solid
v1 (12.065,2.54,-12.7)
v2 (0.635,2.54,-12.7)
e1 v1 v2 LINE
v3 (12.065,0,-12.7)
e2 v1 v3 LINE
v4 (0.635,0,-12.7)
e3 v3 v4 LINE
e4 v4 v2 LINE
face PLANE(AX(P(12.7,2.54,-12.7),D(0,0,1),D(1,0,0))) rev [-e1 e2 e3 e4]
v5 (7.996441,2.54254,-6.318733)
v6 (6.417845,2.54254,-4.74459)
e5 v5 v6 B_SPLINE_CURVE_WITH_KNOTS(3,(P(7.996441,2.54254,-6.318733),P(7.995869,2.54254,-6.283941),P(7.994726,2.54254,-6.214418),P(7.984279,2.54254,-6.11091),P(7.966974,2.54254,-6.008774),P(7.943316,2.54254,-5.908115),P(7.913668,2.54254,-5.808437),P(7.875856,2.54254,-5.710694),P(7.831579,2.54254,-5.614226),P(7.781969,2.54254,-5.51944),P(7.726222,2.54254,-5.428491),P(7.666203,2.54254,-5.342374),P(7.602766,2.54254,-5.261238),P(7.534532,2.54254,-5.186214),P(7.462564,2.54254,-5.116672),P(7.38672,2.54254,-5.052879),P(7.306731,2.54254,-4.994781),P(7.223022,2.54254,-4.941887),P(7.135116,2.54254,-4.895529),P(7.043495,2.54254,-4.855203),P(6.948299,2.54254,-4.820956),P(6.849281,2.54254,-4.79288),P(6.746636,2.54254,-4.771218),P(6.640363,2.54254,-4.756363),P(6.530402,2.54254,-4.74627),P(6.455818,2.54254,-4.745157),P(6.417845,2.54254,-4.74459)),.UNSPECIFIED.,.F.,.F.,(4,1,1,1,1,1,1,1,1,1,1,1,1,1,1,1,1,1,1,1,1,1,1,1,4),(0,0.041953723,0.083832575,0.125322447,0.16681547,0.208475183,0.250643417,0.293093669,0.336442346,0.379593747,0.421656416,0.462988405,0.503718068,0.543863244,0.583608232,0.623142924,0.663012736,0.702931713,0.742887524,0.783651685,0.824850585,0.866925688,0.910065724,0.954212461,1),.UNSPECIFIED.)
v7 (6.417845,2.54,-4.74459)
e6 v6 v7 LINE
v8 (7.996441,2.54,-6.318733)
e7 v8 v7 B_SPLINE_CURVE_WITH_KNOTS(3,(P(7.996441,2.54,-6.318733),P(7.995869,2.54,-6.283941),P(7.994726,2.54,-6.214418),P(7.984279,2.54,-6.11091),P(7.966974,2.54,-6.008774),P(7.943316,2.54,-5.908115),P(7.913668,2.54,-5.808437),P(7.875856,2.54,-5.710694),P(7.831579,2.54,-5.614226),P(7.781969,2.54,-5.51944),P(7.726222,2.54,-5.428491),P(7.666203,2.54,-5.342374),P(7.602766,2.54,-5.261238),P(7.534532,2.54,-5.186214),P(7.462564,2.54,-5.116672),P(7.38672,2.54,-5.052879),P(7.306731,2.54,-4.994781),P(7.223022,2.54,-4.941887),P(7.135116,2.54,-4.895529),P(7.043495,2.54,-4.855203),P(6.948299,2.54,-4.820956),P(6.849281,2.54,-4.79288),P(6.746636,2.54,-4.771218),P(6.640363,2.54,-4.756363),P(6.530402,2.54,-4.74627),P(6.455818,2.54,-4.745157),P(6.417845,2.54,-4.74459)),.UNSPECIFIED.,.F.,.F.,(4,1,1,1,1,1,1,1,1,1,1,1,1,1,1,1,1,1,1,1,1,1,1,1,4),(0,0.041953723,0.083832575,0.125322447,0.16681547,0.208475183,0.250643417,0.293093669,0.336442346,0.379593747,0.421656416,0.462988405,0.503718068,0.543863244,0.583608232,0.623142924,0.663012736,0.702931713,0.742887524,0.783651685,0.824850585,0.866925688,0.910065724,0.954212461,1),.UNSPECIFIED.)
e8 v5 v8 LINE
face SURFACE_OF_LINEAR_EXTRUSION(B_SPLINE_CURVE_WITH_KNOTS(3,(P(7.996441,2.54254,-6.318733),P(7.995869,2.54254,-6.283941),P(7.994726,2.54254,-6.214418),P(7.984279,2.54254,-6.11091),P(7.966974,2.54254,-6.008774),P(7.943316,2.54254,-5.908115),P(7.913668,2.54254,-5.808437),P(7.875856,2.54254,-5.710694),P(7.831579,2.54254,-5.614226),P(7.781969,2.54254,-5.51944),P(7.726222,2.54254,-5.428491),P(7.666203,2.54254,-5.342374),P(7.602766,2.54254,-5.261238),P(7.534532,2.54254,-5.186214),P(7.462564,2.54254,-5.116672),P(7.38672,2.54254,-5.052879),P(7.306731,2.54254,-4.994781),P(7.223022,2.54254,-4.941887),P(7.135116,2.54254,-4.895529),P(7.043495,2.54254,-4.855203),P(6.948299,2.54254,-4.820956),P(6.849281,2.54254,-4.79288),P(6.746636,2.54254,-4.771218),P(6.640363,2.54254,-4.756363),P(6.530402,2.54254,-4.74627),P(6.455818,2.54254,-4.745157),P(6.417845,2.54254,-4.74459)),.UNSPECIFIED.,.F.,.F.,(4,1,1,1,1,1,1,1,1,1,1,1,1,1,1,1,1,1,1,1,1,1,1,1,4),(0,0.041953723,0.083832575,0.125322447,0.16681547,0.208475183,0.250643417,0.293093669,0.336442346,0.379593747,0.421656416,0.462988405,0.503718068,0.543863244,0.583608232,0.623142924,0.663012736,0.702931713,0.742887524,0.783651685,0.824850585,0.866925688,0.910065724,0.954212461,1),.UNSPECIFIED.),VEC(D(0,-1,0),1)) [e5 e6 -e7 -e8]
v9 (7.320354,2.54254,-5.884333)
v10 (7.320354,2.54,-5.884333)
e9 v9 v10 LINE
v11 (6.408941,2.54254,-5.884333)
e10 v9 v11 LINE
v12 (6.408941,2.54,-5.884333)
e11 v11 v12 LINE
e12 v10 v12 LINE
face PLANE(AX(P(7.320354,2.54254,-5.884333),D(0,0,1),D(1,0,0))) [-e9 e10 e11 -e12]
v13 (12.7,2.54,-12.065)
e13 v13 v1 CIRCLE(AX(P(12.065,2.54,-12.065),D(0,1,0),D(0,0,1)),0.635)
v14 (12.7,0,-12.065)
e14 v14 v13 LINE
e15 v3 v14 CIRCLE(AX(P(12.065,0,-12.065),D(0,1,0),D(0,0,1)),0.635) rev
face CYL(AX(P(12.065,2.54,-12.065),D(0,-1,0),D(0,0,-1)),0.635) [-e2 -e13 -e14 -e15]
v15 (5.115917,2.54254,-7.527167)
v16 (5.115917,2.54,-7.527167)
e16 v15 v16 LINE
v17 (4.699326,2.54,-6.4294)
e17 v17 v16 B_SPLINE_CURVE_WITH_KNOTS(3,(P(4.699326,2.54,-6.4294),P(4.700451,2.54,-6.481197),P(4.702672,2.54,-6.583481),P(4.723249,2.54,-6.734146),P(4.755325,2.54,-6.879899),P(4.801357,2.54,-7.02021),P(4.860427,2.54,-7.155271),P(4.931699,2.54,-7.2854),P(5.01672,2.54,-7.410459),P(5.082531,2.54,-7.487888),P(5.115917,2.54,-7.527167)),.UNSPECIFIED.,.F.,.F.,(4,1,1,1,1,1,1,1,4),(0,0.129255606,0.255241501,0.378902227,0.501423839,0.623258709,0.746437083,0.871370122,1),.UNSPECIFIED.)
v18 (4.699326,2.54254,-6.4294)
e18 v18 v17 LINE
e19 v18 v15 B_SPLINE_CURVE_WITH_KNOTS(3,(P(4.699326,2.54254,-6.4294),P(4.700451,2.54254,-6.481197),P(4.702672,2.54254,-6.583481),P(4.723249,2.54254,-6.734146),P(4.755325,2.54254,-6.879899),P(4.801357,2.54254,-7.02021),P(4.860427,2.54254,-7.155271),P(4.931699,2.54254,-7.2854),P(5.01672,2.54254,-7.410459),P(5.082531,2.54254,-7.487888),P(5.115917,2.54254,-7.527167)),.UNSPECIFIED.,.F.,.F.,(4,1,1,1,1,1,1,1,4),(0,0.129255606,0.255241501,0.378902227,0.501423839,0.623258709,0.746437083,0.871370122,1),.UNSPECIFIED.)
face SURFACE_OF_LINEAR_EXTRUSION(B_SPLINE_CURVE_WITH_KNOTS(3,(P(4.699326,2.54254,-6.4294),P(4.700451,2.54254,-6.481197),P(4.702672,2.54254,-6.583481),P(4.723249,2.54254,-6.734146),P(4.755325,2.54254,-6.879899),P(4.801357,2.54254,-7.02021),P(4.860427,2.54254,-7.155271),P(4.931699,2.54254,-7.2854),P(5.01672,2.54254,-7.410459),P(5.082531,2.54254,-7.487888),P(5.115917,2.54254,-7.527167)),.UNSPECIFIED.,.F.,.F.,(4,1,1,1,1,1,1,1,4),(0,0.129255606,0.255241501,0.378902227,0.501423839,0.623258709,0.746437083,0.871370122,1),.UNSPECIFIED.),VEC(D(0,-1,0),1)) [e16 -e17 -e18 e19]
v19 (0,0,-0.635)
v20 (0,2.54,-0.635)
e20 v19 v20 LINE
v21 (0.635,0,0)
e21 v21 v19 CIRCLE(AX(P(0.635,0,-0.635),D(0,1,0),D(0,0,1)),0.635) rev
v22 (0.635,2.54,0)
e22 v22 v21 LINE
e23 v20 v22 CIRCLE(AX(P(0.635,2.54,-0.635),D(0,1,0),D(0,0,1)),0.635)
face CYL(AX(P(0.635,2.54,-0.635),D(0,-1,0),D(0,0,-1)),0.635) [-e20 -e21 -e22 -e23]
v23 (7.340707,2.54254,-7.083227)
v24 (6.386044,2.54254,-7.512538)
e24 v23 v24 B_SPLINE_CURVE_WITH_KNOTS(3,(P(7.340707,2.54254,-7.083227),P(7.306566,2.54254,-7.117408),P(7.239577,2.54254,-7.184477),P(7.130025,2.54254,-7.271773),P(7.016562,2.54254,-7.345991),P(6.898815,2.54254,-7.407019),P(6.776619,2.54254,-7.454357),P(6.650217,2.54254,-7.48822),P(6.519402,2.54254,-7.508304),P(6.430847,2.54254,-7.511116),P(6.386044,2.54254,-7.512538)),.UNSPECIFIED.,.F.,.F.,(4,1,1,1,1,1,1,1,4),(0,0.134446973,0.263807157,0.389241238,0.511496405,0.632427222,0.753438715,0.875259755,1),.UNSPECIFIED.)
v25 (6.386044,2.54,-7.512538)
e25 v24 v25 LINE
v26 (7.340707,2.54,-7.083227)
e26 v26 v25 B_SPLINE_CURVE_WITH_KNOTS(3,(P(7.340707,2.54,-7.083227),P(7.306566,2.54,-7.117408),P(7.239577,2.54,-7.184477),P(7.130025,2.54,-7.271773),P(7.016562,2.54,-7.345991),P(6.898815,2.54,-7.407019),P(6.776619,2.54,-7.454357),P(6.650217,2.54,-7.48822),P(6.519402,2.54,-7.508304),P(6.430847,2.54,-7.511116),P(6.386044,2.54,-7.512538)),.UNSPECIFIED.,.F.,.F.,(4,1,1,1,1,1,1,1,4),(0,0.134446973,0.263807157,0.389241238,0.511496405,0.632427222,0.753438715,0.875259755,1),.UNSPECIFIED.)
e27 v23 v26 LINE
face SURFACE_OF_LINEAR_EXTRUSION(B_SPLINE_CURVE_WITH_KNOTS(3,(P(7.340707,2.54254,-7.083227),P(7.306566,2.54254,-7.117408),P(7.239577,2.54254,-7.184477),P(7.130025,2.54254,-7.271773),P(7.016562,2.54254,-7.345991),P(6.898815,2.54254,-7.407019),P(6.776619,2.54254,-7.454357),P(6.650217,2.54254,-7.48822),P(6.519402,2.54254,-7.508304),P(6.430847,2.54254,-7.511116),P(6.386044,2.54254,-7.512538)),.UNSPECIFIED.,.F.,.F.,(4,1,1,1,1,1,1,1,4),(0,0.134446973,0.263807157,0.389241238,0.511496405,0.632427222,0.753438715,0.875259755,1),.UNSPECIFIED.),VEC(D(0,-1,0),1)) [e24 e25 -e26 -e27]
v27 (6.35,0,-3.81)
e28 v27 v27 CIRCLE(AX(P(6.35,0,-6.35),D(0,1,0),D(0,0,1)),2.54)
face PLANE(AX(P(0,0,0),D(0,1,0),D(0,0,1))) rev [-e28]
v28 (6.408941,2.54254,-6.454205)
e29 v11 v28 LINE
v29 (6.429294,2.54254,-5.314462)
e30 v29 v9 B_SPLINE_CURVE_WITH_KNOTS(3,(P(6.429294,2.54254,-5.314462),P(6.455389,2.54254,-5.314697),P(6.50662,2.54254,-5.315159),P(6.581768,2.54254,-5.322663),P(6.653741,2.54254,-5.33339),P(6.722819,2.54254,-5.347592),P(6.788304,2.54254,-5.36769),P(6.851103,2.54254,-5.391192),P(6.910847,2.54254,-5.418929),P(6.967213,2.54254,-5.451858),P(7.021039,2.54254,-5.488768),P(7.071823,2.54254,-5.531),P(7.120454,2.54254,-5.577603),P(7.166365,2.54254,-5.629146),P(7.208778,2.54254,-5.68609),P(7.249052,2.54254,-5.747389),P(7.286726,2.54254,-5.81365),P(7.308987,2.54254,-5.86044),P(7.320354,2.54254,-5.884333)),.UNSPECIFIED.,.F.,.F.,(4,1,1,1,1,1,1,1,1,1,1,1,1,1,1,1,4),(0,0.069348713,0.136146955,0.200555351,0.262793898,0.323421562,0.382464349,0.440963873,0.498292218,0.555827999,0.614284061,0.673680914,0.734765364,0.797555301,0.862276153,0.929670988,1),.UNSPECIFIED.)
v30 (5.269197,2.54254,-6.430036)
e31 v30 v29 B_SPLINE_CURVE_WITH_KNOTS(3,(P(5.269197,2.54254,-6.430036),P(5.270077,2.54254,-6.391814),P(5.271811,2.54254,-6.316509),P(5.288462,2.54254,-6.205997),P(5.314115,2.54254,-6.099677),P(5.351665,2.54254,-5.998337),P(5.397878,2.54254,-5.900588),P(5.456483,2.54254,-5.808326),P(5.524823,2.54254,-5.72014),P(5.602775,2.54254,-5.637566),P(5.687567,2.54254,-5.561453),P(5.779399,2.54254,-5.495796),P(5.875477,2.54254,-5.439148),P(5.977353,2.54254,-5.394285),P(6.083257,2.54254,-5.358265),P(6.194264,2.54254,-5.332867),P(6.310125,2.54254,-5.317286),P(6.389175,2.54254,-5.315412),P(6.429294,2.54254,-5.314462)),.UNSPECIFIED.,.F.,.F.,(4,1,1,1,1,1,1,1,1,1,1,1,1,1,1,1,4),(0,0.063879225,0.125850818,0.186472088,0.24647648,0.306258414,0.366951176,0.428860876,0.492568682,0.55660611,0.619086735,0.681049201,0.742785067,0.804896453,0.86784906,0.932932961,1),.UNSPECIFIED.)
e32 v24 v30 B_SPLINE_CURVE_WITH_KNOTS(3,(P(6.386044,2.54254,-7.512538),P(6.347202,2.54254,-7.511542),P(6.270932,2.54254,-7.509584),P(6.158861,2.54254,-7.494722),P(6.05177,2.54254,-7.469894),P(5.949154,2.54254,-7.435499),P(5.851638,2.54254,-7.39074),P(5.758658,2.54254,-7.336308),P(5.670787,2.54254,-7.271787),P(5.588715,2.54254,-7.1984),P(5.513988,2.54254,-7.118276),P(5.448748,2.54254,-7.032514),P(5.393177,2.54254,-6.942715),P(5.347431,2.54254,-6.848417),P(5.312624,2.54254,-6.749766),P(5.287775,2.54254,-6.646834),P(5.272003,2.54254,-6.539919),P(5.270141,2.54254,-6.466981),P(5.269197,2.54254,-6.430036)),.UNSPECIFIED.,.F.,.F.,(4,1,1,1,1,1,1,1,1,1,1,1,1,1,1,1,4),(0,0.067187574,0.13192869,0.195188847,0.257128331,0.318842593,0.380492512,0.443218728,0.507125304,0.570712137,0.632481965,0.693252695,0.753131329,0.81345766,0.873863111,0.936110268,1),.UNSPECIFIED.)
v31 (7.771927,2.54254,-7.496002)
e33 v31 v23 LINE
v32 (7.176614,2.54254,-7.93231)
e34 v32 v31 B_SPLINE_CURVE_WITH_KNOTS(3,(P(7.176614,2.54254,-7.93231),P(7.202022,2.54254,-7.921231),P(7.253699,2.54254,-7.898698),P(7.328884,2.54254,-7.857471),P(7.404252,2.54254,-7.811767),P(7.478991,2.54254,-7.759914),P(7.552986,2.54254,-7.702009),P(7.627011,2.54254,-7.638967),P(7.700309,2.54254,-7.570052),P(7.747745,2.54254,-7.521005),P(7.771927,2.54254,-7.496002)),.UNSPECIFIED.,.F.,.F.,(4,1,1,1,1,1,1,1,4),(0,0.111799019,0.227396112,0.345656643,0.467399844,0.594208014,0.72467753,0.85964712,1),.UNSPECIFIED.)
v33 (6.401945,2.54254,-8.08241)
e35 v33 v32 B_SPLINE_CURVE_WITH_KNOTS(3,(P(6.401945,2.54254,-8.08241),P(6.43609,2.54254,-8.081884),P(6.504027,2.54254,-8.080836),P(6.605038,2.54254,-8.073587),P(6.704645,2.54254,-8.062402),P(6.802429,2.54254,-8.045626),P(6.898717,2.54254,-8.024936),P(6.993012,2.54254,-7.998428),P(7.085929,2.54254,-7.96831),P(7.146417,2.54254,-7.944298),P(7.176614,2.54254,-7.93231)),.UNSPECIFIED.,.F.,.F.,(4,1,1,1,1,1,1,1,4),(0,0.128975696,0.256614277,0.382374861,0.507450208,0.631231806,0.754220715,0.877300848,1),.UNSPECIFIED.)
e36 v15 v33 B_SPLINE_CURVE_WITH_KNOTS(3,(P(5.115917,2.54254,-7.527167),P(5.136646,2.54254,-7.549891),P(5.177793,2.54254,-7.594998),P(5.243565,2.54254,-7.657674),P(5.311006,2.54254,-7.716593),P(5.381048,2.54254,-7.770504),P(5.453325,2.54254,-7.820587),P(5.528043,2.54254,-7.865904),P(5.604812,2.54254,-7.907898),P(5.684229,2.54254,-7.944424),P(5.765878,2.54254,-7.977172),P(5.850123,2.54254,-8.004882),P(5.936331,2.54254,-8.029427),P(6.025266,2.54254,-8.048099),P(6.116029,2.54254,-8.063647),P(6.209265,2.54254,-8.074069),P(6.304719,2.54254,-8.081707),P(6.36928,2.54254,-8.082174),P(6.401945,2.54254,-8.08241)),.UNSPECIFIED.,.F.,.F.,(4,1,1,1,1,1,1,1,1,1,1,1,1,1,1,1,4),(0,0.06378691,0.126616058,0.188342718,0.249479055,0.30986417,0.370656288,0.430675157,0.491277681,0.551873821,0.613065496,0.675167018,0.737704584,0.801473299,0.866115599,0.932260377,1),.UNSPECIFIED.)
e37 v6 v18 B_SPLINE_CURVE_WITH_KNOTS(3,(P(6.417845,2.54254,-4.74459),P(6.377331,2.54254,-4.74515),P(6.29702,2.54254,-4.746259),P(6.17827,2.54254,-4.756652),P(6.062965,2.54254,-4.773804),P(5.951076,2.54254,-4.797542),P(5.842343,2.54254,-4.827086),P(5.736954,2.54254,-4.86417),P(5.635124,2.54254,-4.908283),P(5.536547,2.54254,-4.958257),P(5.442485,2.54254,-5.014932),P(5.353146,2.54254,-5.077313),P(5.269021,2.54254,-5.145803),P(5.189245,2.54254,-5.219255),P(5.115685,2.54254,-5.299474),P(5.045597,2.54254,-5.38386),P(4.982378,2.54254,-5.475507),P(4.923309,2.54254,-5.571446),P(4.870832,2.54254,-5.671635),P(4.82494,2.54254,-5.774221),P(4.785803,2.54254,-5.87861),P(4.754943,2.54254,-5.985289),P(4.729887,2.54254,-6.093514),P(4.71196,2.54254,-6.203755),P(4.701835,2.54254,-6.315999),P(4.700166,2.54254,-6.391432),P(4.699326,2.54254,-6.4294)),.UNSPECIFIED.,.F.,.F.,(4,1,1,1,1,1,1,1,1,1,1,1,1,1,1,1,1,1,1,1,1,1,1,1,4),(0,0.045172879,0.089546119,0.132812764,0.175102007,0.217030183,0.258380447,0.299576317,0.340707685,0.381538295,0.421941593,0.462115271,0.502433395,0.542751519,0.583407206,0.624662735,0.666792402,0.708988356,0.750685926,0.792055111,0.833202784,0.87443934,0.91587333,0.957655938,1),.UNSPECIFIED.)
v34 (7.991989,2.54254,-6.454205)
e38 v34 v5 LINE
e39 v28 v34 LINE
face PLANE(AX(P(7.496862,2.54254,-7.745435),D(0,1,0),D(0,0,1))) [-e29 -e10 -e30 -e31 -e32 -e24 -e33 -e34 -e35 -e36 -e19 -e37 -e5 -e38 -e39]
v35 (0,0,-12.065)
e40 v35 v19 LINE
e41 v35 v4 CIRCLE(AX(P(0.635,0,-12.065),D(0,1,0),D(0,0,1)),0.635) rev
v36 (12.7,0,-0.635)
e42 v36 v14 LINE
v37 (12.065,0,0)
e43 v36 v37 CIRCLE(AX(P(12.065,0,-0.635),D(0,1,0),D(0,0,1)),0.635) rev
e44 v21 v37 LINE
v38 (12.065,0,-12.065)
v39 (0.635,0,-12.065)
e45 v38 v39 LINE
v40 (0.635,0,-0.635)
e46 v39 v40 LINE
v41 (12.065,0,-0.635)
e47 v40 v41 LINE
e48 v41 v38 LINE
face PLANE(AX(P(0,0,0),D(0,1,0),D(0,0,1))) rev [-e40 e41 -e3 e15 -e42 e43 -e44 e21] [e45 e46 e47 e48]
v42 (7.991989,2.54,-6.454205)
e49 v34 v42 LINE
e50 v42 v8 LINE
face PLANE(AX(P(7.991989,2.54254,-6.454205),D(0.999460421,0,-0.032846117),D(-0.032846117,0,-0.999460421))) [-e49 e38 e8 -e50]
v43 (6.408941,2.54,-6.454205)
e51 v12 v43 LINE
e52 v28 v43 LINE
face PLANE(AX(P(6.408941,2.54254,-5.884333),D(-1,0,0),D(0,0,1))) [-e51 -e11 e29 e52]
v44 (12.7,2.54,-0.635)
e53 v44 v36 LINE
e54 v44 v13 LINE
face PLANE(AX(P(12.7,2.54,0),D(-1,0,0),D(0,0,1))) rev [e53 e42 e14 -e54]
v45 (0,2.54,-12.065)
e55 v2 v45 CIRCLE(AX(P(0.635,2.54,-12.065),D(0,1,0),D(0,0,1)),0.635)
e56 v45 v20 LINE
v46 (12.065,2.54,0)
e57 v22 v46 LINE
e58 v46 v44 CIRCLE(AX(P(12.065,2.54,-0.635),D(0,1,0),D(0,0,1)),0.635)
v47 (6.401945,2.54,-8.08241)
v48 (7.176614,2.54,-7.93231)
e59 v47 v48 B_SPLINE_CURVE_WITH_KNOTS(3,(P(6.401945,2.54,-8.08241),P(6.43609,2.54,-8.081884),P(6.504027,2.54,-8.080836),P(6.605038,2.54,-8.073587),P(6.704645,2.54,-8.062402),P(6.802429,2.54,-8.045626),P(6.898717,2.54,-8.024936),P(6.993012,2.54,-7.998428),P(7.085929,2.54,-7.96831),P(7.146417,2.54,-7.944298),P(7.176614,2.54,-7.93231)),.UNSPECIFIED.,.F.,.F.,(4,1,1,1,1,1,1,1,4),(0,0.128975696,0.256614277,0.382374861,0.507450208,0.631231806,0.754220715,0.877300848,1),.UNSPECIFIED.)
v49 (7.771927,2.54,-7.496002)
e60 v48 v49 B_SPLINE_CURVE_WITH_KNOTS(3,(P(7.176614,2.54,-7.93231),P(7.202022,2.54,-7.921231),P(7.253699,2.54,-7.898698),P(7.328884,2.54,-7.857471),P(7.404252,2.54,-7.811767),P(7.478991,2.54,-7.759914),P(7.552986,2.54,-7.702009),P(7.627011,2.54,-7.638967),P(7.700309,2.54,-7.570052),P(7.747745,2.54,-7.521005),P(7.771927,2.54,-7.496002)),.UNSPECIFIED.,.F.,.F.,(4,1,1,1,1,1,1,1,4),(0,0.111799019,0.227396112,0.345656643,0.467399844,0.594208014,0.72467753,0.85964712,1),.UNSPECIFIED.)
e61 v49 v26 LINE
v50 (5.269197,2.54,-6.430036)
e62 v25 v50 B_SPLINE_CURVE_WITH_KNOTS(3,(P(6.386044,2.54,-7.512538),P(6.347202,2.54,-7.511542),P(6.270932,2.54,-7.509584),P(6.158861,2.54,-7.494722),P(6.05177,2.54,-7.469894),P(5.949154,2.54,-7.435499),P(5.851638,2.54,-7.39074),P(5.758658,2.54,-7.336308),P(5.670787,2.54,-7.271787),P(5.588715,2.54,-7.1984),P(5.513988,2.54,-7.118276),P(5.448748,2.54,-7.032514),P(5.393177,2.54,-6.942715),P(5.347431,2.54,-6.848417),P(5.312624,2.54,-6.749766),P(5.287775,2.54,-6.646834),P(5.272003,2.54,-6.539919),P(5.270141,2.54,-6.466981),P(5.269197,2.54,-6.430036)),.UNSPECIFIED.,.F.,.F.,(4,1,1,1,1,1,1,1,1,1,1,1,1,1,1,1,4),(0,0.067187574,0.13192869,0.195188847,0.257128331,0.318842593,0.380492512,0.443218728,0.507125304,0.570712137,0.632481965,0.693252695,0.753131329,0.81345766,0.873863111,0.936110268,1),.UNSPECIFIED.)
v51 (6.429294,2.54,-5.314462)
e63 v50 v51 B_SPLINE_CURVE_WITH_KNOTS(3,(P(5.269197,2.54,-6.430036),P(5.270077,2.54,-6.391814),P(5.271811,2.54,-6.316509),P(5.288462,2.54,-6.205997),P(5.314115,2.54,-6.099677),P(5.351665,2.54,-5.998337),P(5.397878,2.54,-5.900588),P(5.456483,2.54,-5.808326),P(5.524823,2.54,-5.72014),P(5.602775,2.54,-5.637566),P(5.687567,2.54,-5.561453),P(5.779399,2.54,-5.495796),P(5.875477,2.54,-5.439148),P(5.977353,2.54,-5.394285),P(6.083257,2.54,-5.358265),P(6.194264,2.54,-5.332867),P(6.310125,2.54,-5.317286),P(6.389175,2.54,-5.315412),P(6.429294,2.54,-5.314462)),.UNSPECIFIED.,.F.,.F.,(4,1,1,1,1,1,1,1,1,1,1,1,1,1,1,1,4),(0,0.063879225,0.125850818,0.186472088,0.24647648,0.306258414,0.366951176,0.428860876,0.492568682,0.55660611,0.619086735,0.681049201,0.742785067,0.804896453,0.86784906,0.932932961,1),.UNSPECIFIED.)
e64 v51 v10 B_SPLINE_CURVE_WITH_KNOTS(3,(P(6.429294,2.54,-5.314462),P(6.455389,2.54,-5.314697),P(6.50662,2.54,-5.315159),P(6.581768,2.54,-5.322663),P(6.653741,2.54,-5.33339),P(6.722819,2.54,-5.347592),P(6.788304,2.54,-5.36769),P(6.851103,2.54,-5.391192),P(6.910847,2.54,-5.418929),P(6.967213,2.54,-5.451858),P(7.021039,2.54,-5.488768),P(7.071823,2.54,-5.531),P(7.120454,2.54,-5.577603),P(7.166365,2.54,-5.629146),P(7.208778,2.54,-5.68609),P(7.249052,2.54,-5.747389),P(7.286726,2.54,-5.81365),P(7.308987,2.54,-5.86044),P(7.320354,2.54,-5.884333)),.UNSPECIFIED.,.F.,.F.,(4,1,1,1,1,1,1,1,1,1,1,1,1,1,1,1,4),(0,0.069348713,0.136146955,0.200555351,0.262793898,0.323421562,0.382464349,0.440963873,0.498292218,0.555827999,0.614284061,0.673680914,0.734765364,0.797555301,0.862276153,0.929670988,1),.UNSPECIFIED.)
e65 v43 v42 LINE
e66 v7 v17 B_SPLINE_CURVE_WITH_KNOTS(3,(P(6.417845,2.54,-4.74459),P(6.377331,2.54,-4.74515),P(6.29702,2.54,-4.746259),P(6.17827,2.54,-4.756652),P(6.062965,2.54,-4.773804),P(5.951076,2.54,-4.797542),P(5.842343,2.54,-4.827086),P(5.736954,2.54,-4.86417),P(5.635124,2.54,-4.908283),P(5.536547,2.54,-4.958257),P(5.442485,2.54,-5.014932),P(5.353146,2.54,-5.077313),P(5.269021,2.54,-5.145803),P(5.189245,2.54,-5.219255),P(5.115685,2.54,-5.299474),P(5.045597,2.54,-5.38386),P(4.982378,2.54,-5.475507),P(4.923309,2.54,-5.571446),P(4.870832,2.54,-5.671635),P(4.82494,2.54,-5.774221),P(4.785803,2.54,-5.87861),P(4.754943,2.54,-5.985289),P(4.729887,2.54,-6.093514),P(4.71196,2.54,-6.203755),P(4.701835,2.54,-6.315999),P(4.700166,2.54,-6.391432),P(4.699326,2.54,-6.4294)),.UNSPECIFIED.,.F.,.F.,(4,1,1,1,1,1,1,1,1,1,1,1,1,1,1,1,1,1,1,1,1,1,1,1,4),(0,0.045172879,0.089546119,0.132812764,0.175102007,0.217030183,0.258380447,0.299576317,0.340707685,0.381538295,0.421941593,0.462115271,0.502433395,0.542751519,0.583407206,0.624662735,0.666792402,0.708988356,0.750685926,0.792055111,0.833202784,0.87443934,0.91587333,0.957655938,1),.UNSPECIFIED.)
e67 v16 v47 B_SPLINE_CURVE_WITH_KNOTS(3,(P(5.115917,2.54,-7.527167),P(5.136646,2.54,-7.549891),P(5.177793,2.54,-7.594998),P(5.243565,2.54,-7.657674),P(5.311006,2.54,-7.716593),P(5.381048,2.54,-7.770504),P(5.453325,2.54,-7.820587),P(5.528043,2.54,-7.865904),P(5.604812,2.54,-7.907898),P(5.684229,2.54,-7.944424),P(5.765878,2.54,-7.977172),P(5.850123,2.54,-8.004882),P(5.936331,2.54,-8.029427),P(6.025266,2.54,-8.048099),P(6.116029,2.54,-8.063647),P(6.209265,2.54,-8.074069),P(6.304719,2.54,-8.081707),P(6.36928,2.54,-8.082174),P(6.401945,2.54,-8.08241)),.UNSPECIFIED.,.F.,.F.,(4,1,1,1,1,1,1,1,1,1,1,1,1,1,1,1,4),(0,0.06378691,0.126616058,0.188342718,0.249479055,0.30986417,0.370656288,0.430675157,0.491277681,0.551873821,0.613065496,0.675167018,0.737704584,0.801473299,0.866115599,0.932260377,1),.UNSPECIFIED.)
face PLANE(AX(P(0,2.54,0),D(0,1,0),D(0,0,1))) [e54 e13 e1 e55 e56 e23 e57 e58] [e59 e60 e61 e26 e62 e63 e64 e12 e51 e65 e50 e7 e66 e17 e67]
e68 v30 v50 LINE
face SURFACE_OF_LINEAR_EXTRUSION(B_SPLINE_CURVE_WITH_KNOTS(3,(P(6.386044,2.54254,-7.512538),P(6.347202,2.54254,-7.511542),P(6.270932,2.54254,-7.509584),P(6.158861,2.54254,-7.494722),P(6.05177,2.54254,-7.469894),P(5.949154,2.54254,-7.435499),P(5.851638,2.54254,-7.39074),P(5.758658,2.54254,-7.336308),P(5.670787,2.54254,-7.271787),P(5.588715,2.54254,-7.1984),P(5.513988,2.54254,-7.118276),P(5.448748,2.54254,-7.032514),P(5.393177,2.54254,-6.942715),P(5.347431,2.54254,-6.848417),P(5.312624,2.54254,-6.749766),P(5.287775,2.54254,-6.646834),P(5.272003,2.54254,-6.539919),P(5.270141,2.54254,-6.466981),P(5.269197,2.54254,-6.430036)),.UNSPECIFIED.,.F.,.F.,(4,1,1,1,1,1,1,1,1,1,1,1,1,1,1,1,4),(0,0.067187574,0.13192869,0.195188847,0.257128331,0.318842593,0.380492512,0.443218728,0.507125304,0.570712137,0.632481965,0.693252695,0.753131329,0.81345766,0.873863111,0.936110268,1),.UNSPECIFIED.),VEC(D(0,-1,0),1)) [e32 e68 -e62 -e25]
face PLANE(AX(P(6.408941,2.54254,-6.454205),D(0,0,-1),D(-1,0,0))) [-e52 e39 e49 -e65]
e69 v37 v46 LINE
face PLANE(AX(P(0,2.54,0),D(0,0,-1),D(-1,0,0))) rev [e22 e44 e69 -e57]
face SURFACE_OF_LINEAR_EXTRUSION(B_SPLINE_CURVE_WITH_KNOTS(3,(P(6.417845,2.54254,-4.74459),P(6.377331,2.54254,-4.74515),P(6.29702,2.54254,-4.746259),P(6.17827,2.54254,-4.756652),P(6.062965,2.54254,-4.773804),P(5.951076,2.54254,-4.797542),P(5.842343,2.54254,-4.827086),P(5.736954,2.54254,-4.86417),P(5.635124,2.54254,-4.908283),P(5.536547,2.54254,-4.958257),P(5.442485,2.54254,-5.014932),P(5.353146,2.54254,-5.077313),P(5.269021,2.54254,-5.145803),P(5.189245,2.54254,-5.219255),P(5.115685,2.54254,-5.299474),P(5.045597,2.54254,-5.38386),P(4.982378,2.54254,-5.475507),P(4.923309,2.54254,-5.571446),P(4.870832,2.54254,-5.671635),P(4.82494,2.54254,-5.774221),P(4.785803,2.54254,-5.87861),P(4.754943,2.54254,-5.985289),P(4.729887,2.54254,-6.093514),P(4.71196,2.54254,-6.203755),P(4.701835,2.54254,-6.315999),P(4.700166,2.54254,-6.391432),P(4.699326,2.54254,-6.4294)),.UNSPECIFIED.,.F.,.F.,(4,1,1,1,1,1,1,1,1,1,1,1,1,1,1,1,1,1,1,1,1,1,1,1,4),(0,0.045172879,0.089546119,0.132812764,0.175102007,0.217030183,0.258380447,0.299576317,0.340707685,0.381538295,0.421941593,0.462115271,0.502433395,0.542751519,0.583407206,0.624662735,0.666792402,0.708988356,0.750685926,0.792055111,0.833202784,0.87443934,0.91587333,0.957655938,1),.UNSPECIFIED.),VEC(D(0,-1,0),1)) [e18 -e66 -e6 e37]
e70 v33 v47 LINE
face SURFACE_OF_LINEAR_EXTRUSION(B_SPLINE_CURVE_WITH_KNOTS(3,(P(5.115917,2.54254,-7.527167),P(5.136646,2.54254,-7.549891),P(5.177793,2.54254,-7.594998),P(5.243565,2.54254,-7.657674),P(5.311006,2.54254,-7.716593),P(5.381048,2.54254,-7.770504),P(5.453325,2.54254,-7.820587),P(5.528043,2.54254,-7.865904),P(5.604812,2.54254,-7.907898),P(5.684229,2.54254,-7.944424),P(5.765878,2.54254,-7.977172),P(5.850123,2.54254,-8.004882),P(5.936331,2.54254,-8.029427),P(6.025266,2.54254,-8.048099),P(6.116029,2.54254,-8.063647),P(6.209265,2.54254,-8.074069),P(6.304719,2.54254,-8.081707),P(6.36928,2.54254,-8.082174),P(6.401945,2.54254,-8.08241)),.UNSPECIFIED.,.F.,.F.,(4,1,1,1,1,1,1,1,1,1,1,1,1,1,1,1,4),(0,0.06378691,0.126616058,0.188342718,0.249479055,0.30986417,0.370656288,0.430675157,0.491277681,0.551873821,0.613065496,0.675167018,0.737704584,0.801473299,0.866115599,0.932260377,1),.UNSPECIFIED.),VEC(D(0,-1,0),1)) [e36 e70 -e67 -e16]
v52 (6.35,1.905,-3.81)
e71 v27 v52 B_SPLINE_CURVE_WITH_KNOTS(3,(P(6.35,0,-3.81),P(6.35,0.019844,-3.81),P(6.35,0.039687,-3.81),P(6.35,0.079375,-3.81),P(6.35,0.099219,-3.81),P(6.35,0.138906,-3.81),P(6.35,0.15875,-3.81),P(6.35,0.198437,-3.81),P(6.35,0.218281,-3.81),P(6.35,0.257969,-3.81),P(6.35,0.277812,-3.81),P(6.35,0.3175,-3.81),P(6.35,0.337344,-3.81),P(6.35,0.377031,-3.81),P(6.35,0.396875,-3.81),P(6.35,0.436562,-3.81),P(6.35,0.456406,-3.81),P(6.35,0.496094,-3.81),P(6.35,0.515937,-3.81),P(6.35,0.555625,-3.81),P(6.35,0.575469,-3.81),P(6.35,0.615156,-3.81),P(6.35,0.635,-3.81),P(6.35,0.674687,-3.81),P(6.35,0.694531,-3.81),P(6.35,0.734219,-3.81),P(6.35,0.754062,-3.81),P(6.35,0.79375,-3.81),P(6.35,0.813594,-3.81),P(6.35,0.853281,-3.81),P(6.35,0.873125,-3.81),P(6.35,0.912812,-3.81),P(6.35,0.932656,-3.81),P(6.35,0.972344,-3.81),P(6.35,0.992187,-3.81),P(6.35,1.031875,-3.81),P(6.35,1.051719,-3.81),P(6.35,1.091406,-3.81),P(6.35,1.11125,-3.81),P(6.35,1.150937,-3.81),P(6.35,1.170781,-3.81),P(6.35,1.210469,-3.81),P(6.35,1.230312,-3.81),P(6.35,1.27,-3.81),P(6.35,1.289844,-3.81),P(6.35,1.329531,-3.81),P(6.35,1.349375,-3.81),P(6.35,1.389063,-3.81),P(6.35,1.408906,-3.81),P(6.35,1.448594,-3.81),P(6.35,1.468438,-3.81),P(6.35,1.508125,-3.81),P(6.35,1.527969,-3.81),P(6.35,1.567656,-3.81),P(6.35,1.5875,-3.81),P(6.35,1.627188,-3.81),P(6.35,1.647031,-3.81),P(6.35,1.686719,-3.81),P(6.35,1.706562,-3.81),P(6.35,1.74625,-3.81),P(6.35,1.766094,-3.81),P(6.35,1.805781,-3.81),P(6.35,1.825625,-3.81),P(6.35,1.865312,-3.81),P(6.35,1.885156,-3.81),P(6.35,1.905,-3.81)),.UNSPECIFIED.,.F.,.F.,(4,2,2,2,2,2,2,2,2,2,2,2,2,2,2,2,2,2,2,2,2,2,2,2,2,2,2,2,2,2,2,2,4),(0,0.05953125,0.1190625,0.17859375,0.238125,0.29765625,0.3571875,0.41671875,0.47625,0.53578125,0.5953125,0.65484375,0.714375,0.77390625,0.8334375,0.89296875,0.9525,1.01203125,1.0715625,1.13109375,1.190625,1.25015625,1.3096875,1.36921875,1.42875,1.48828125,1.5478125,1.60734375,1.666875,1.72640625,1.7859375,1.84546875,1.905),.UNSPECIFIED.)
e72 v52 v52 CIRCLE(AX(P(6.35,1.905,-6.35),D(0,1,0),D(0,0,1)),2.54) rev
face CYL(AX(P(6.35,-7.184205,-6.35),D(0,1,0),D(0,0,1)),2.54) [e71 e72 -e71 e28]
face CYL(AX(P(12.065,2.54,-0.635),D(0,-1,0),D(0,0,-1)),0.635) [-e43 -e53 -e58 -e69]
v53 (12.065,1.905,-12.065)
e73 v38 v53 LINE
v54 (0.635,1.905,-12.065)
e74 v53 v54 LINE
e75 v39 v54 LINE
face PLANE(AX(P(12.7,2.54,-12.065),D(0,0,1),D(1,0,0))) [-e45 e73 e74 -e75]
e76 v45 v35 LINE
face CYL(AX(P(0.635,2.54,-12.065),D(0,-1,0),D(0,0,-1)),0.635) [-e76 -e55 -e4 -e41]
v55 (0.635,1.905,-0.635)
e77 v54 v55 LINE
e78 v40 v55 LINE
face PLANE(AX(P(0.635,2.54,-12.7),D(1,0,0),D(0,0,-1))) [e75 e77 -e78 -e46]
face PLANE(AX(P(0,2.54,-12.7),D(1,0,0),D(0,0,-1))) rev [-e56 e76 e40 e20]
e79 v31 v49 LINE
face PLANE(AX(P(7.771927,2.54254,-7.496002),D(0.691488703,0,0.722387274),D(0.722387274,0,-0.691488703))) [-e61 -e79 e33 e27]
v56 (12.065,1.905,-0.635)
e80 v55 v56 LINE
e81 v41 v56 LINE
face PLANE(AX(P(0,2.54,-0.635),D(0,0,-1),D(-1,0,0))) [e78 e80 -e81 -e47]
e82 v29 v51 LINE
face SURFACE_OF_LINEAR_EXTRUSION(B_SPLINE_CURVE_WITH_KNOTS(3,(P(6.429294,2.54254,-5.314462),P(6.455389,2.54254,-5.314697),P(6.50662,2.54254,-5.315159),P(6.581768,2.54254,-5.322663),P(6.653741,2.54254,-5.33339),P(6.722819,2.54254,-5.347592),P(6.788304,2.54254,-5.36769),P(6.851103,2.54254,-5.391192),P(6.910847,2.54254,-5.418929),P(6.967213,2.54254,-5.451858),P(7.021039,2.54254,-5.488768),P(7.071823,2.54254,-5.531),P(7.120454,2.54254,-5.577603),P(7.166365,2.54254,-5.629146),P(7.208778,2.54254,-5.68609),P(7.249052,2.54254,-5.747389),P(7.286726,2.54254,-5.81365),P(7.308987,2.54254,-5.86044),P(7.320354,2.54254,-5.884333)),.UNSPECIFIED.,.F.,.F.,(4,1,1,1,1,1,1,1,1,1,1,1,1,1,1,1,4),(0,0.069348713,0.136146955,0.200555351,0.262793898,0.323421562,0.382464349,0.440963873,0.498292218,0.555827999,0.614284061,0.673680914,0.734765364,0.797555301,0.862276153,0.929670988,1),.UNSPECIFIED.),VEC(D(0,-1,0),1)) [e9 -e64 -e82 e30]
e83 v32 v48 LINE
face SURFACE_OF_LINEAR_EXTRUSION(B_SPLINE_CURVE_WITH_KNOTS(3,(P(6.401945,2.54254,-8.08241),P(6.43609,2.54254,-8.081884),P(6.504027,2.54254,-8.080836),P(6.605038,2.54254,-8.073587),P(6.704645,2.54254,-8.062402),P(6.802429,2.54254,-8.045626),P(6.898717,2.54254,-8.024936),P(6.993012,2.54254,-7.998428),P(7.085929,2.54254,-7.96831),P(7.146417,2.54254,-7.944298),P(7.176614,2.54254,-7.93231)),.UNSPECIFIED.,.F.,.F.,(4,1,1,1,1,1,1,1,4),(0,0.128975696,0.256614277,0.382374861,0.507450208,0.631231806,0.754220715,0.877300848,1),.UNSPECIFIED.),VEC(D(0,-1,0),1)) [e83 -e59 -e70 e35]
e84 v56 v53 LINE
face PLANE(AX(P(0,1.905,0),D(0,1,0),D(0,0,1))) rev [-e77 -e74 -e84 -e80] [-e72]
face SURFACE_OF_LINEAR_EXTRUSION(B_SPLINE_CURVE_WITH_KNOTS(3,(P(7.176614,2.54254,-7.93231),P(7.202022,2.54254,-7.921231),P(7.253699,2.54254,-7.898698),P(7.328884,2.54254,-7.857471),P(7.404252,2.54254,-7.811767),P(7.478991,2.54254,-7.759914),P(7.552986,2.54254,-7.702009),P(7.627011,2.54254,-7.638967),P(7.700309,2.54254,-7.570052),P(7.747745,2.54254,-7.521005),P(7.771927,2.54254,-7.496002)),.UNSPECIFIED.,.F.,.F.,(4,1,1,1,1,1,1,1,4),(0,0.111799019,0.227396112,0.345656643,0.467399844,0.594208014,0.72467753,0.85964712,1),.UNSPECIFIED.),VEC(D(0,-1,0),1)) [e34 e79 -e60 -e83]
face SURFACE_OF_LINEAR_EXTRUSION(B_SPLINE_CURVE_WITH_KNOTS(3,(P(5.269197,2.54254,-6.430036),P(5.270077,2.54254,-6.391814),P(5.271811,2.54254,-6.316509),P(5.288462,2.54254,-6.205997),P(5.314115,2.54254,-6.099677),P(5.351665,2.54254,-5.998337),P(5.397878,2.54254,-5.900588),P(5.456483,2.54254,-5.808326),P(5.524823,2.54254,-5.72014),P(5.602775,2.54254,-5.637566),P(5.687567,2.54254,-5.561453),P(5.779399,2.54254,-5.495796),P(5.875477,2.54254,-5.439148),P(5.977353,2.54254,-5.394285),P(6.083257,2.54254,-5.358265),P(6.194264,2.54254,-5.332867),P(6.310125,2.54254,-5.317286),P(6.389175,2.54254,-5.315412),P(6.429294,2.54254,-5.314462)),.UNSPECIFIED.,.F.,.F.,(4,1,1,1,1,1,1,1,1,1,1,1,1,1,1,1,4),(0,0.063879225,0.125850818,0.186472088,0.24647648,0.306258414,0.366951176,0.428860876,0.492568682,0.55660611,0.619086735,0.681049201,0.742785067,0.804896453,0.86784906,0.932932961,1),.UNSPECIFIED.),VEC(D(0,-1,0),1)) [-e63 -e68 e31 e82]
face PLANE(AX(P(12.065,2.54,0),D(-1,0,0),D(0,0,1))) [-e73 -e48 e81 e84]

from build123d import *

# Parameters (mm, degrees)
SKETCH1_W           = 12.7
SKETCH1_H           = 12.7
BOSS_EXTRUDE1_DEPTH = 2.54
FILLET1_R           = 0.635
SHELL1_START        = 0.635
SHELL1_OUTLINE_W    = 1.905
SHELL1_OUTLINE_H    = 11.43
SHELL1_DEPTH        = 11.43
SKETCH2_R           = 2.54
BOSS_EXTRUDE2_DEPTH = 1.905
BOSS_EXTRUDE3_DEPTH = 0.00254


# Read off the part's stored shape, not the designer's step: Shell1
with BuildPart() as part:
    # Sketch1 → Boss-Extrude1 (new body)
    with BuildSketch(Plane(origin=(0, 0, 0), x_dir=(1, 0, 0), z_dir=(0, 1, 0))):
        with Locations((6.35, 6.35)):
            Rectangle(SKETCH1_W, SKETCH1_H)
    extrude(amount=BOSS_EXTRUDE1_DEPTH)

    # Fillet1
    fillet1_edges = [part.edges().sort_by_distance(p)[0] for p in [
        (0, 1.27, -12.7),
        (12.7, 1.27, -12.7),
        (12.7, 1.27, 0),
        (0, 1.27, 0),
    ]]
    fillet(fillet1_edges, radius=FILLET1_R)

    # Shell1 outline → Shell1 (cut)
    with BuildSketch(Plane.YZ.offset(SHELL1_START)):
        with Locations((0.9525, -6.35)):
            Rectangle(SHELL1_OUTLINE_W, SHELL1_OUTLINE_H)
    extrude(amount=SHELL1_DEPTH, mode=Mode.SUBTRACT)

    # Sketch2 → Boss-Extrude2 (add)
    with BuildSketch(Plane(origin=(0, 1.905, 0), x_dir=(-1, 0, 0), z_dir=(0, -1, 0))):
        with Locations(Location((-6.35, 6.35, 0), (0, 0, 270))):
            Circle(SKETCH2_R)
    extrude(amount=BOSS_EXTRUDE2_DEPTH)

    # Sketch3 → Boss-Extrude3 (add)
    with BuildSketch(Plane(origin=(0, 2.54, 0), x_dir=(1, 0, 0), z_dir=(0, 1, 0))):
        with BuildLine():
            Line((7.771926803, 7.496002003), (7.340706851, 7.083226562))
            add(Edge.make_bspline(
                [(7.340706851, 7.083226562), (7.306566415, 7.117407905), (7.239577243, 7.184477342), (7.130024832, 7.271772823), (7.016561783, 7.345991239), (6.898814643, 7.407018813), (6.776619389, 7.454357105), (6.650217166, 7.4882197), (6.519402332, 7.508304178), (6.430846529, 7.511115937), (6.386044391, 7.512538462)],
                knots=[0, 0, 0, 0, 1.075575784, 2.110457258, 3.113929901, 4.09197124, 5.059417775, 6.02750972, 7.002078037, 8, 8, 8, 8], degree=3))
            add(Edge.make_bspline(
                [(6.386044391, 7.512538462), (6.347202307, 7.511541705), (6.270932472, 7.509584486), (6.158861293, 7.494721502), (6.051770417, 7.469893554), (5.949153902, 7.435498578), (5.851638258, 7.390739844), (5.758658459, 7.33630815), (5.670786706, 7.271787088), (5.588714925, 7.198399755), (5.513988304, 7.118275604), (5.448748017, 7.03251443), (5.39317731, 6.942714749), (5.347431283, 6.848417132), (5.312623532, 6.749766307), (5.287775353, 6.64683389), (5.272002938, 6.539919017), (5.270140687, 6.466980583), (5.269197436, 6.430036458)],
                knots=[0, 0, 0, 0, 1.075001177, 2.110859044, 3.123021556, 4.114053297, 5.101481495, 6.087880186, 7.091499647, 8.114004866, 9.131394192, 10.11971144, 11.092043119, 12.050101265, 13.015322563, 13.981809771, 14.977764287, 16, 16, 16, 16], degree=3))
            add(Edge.make_bspline(
                [(5.269197436, 6.430036458), (5.270077255, 6.391813648), (5.271810619, 6.316509478), (5.288461543, 6.205997372), (5.314115158, 6.099676762), (5.35166521, 5.998336523), (5.397877952, 5.900588436), (5.456483323, 5.808325972), (5.52482305, 5.720140184), (5.602775019, 5.637566437), (5.687566632, 5.561453315), (5.779398707, 5.495796177), (5.87547715, 5.439148239), (5.977352671, 5.394284903), (6.083257013, 5.358264559), (6.19426435, 5.332867125), (6.31012472, 5.317285888), (6.389175206, 5.31541236), (6.42929359, 5.314461538)],
                knots=[0, 0, 0, 0, 1.022067601, 2.013613092, 2.983553406, 3.943623673, 4.90013463, 5.87121881, 6.861774014, 7.881098904, 8.905697761, 9.905387765, 10.89678721, 11.884561068, 12.87834324, 13.885584958, 14.926927371, 16, 16, 16, 16], degree=3))
            add(Edge.make_bspline(
                [(6.42929359, 5.314461538), (6.455389112, 5.314696994), (6.50662043, 5.315159245), (6.581768042, 5.322662884), (6.653741405, 5.333390208), (6.722819251, 5.347591911), (6.78830408, 5.367689869), (6.851102574, 5.391191957), (6.910846789, 5.418929106), (6.967212798, 5.4518583), (7.021039491, 5.488767902), (7.07182304, 5.531000335), (7.120454247, 5.577603414), (7.166364864, 5.629146461), (7.20877784, 5.686090332), (7.249051978, 5.747388607), (7.286726148, 5.813649634), (7.308986821, 5.860439815), (7.320354287, 5.884333333)],
                knots=[0, 0, 0, 0, 1.109579412, 2.178351274, 3.208885622, 4.204702371, 5.174744997, 6.119429583, 7.05542196, 7.97267548, 8.893247984, 9.828544973, 10.778894627, 11.756245826, 12.760884819, 13.796418446, 14.874735809, 16, 16, 16, 16], degree=3))
            Line((7.320354287, 5.884333333), (6.408941026, 5.884333333))
            Line((6.408941026, 5.884333333), (6.408941026, 6.454205128))
            Line((6.408941026, 6.454205128), (7.991988902, 6.454205128))
            Line((7.991988902, 6.454205128), (7.996441026, 6.318733373))
            add(Edge.make_bspline(
                [(7.996441026, 6.318733373), (7.995868961, 6.283940789), (7.994725852, 6.214417712), (7.984279039, 6.110909693), (7.966974052, 6.008774494), (7.943316479, 5.908114696), (7.913667554, 5.808436526), (7.875855895, 5.710694487), (7.831578672, 5.614225725), (7.781969186, 5.519440156), (7.726222397, 5.428490826), (7.666202793, 5.342373816), (7.602765995, 5.261238176), (7.534532278, 5.18621433), (7.462564154, 5.116672044), (7.386719952, 5.052878855), (7.306731416, 4.994780786), (7.223022277, 4.941887042), (7.13511573, 4.895528796), (7.043495085, 4.855203272), (6.948298678, 4.820955656), (6.849280734, 4.792880061), (6.746636094, 4.771217506), (6.64036256, 4.756363463), (6.530401766, 4.746269974), (6.455817686, 4.745156592), (6.417845272, 4.744589744)],
                knots=[0, 0, 0, 0, 1.006889344, 2.011981806, 3.007738725, 4.003571281, 5.003404394, 6.015442001, 7.03424805, 8.074616296, 9.110249922, 10.119753985, 11.111721717, 12.089233633, 13.052717867, 14.006597561, 14.955430184, 15.912305663, 16.870361111, 17.829300583, 18.807640451, 19.796414044, 20.806216501, 21.841577364, 22.90109906, 24, 24, 24, 24], degree=3))
            add(Edge.make_bspline(
                [(6.417845272, 4.744589744), (6.377331282, 4.745149516), (6.297020469, 4.746259153), (6.178270169, 4.756651657), (6.062964889, 4.773803815), (5.951075868, 4.797541814), (5.842343325, 4.827085651), (5.736954077, 4.864170155), (5.635123675, 4.908283344), (5.536547184, 4.958257086), (5.442484518, 5.014931662), (5.353146488, 5.077313277), (5.269020717, 5.145803203), (5.189245497, 5.219254905), (5.115684686, 5.299473831), (5.045596958, 5.383859699), (4.982377825, 5.475507443), (4.923309052, 5.571445818), (4.870831882, 5.671634621), (4.824939843, 5.774220808), (4.785803137, 5.878610404), (4.754942899, 5.985289482), (4.729887276, 6.093514186), (4.711959507, 6.203755162), (4.701834859, 6.315998608), (4.70016576, 6.391432018), (4.699325641, 6.429400441)],
                knots=[0, 0, 0, 0, 1.084149091, 2.14910686, 3.187506334, 4.202448172, 5.208724393, 6.201130722, 7.189831603, 8.176984443, 9.156919086, 10.126598231, 11.090766514, 12.05840148, 13.026036446, 14.001772938, 14.991905635, 16.003017641, 17.015720547, 18.016462227, 19.009322657, 19.99686681, 20.986544154, 21.980959929, 22.983742515, 24, 24, 24, 24], degree=3))
            add(Edge.make_bspline(
                [(4.699325641, 6.429400441), (4.70045074, 6.481197483), (4.702672477, 6.583481286), (4.72324913, 6.734145976), (4.755325067, 6.87989903), (4.801357267, 7.020209626), (4.860427449, 7.155271043), (4.931698831, 7.285400345), (5.016719582, 7.410459214), (5.082531483, 7.487888023), (5.115917187, 7.527166867)],
                knots=[0, 0, 0, 0, 1.034044851, 2.041932006, 3.031217818, 4.011390712, 4.986069675, 5.97149666, 6.970960976, 8, 8, 8, 8], degree=3))
            add(Edge.make_bspline(
                [(5.115917187, 7.527166867), (5.136646046, 7.549890869), (5.177792517, 7.59499767), (5.243565077, 7.657674489), (5.311005647, 7.716593018), (5.381048291, 7.770503925), (5.453324806, 7.820587348), (5.528043218, 7.865904431), (5.604811571, 7.907898096), (5.684228565, 7.944423986), (5.765878441, 7.977172494), (5.850122815, 8.004882336), (5.936330711, 8.02942667), (6.025265506, 8.048098613), (6.116028744, 8.063647182), (6.209264693, 8.074068647), (6.304719281, 8.081706839), (6.369279964, 8.082173929), (6.401944832, 8.082410256)],
                knots=[0, 0, 0, 0, 1.020590567, 2.025856924, 3.013483481, 3.991664875, 4.957826714, 5.930500614, 6.890802512, 7.860442893, 8.829981142, 9.809047939, 10.802672283, 11.803273349, 12.823572789, 13.857849586, 14.916166035, 16, 16, 16, 16], degree=3))
            add(Edge.make_bspline(
                [(6.401944832, 8.082410256), (6.436090224, 8.081883676), (6.504027016, 8.080835974), (6.605037776, 8.073586558), (6.704644924, 8.062402419), (6.802428705, 8.045625571), (6.898717283, 8.024936226), (6.993012244, 7.998428055), (7.085928747, 7.968309997), (7.146417038, 7.944297656), (7.176614303, 7.932310096)],
                knots=[0, 0, 0, 0, 1.03180557, 2.052914215, 3.058998889, 4.059601663, 5.049854447, 6.033765722, 7.018406786, 8, 8, 8, 8], degree=3))
            add(Edge.make_bspline(
                [(7.176614303, 7.932310096), (7.202021565, 7.921231433), (7.253699235, 7.898697739), (7.328883874, 7.857471289), (7.40425221, 7.811767038), (7.47899098, 7.759913932), (7.552986303, 7.70200896), (7.62701077, 7.638966722), (7.70030871, 7.570052109), (7.747744937, 7.521005039), (7.771926803, 7.496002003)],
                knots=[0, 0, 0, 0, 0.894392155, 1.819168899, 2.76525314, 3.739198753, 4.75366411, 5.797420238, 6.877176959, 8, 8, 8, 8], degree=3))
        make_face()
    extrude(amount=BOSS_EXTRUDE3_DEPTH)


solid = part.part
